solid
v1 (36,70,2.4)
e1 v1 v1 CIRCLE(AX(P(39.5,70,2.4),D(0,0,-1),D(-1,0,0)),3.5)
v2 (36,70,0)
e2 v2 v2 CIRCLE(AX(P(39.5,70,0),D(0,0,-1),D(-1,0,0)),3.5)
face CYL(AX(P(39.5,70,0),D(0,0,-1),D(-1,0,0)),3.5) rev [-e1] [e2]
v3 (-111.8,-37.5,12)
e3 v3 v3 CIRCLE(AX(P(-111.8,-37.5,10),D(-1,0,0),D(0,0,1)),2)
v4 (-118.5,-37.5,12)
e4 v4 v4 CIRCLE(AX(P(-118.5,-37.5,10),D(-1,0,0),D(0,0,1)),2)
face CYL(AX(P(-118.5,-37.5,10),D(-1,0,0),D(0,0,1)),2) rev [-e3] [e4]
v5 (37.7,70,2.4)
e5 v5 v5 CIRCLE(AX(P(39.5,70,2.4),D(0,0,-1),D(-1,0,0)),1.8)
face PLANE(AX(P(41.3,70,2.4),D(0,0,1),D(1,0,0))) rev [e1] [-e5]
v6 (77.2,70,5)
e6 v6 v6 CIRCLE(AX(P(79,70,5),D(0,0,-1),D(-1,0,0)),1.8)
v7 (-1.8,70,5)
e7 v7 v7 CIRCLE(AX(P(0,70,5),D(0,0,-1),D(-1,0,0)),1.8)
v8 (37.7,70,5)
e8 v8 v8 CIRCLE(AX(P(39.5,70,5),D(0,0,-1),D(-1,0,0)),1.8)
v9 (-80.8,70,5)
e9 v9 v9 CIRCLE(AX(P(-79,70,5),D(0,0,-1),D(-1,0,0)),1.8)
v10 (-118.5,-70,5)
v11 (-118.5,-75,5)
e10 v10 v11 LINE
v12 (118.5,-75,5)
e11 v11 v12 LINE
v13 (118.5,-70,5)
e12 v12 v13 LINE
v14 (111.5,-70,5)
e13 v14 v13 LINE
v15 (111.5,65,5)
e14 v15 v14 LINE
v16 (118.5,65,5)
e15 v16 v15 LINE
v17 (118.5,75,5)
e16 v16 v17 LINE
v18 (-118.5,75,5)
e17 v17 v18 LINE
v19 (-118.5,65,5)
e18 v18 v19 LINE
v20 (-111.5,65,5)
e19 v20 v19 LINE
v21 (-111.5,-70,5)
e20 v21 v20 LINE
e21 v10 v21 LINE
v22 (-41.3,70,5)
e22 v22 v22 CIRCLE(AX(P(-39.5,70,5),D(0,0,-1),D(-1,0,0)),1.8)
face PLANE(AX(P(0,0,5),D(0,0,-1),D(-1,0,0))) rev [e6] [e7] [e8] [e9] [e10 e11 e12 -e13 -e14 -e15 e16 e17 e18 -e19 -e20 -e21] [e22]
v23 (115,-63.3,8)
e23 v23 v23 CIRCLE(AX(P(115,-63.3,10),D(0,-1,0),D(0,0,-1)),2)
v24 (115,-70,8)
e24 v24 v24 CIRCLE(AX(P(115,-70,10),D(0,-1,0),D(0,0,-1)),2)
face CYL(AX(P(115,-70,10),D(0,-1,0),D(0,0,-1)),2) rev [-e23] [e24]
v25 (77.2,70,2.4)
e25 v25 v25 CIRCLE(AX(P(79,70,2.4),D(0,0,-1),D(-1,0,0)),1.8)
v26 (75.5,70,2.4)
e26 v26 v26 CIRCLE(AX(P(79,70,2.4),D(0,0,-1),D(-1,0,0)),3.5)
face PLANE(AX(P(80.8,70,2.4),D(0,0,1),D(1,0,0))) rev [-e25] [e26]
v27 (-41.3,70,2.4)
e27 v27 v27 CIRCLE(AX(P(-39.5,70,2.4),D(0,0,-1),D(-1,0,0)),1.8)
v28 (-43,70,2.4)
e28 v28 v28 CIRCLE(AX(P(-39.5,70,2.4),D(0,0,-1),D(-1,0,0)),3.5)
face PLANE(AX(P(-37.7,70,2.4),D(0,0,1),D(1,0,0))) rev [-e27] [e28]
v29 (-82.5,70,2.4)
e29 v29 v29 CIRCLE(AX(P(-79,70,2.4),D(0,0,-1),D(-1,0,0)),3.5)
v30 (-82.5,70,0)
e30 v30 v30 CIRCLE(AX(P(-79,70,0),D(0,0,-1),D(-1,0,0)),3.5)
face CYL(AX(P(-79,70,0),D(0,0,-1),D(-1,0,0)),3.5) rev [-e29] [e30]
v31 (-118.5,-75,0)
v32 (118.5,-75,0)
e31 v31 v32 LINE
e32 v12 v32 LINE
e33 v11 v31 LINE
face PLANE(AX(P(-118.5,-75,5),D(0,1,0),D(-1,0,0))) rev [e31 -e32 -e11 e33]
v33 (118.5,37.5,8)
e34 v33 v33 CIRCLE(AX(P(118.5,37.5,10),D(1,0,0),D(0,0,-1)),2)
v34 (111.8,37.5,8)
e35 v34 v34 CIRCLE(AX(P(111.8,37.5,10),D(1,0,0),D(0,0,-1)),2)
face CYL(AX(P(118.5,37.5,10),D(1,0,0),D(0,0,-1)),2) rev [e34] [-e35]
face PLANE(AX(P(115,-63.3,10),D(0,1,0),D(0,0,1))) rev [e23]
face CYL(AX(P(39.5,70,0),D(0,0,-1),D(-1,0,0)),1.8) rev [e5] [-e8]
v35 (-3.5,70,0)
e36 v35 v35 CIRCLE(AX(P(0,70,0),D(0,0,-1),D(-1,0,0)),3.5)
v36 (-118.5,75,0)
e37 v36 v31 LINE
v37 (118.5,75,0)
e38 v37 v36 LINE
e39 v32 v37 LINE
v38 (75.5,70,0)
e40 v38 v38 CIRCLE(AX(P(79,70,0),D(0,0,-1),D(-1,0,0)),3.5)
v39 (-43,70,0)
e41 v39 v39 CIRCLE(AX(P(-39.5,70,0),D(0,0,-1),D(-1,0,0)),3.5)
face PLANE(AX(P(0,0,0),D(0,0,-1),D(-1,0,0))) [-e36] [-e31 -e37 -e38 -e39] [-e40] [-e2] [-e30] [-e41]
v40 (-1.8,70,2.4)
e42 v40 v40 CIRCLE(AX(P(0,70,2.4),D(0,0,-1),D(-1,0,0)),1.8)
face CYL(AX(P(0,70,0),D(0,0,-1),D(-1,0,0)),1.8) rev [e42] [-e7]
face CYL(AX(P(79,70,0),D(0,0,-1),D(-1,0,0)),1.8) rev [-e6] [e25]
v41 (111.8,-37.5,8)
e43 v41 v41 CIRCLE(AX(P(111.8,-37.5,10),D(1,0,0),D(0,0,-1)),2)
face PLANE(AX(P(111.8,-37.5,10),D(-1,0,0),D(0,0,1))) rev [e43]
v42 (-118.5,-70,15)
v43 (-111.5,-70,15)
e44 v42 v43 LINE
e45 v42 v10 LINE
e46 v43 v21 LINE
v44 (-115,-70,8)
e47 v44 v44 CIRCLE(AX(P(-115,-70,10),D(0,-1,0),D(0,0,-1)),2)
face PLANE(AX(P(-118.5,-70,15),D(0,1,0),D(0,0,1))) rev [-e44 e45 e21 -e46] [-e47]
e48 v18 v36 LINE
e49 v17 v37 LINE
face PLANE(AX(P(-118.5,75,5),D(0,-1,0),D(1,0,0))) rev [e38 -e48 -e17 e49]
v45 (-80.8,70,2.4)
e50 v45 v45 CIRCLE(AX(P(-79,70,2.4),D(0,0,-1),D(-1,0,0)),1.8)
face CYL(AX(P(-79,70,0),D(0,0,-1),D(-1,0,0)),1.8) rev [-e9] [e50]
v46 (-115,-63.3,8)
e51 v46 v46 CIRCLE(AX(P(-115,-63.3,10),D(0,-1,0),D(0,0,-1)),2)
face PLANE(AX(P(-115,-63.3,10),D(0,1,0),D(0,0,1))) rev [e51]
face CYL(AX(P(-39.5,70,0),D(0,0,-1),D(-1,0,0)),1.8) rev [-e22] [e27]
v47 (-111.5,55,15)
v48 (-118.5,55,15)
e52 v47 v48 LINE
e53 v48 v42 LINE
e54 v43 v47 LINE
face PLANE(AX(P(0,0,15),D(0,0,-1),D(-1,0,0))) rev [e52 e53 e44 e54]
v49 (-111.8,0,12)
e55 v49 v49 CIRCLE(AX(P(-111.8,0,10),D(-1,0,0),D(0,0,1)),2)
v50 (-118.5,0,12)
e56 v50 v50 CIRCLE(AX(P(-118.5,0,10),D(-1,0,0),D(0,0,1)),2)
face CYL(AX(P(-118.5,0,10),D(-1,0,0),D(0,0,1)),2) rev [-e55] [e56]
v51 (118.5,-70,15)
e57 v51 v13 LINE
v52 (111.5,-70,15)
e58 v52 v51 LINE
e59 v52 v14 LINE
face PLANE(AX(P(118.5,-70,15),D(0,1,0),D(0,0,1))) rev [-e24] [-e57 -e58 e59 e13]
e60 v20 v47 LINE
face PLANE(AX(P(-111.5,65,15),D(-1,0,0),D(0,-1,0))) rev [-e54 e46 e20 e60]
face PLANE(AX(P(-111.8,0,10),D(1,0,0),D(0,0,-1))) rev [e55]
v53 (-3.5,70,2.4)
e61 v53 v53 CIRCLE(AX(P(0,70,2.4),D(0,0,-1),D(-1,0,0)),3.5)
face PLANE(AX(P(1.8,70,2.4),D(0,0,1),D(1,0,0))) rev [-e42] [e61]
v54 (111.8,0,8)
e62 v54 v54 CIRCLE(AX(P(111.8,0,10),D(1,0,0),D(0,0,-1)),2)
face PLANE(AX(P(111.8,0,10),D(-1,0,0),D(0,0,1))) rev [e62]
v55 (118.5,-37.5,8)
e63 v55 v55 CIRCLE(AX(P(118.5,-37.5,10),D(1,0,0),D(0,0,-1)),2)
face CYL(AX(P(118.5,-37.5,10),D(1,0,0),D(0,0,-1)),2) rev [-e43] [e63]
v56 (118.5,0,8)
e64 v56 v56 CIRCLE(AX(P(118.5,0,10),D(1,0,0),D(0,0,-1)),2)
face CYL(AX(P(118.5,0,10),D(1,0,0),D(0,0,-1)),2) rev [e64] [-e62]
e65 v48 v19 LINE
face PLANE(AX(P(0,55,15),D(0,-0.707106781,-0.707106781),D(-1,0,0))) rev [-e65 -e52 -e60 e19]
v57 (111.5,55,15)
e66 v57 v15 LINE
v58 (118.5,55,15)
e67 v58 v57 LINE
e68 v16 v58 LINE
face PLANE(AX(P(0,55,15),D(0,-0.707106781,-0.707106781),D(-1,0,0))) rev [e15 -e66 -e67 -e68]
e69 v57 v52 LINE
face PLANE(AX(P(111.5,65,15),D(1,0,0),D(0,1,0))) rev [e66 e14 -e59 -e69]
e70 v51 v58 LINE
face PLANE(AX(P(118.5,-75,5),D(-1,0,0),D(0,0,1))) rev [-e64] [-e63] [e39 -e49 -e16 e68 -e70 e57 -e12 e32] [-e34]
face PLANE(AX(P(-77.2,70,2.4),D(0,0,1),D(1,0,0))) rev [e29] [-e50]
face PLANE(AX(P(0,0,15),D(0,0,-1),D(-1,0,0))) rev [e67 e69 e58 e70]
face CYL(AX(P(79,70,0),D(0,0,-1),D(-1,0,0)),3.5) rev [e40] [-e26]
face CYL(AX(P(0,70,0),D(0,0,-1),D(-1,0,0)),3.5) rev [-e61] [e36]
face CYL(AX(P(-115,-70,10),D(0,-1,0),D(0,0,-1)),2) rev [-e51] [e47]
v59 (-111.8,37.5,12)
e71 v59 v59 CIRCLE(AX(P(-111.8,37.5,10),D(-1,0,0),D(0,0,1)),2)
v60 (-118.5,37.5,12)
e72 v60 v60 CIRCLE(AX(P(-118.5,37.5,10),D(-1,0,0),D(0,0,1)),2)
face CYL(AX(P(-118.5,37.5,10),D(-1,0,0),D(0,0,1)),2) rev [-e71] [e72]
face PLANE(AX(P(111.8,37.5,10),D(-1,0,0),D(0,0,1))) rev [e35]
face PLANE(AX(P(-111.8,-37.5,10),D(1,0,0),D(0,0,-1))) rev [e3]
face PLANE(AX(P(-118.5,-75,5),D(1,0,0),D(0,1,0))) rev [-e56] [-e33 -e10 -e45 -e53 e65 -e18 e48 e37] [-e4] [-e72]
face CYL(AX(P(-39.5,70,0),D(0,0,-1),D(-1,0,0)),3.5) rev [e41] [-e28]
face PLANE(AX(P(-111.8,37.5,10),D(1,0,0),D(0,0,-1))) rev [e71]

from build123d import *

# Parameters (mm, degrees)
SZKIC1_W                                          = 237
SZKIC1_H                                          = 150
DODANIE_WYCI_GNI_CIE1_DEPTH                       = 5
SZKIC2_W                                          = 7
SZKIC2_H                                          = 135
DODANIE_WYCI_GNI_CIE2_DEPTH                       = 10
OTW_R_4_0_4_1_D                                   = 4
OTW_R_4_0_4_1_DEPTH                               = 6.7
SFAZOWANIE1_SIZE                                  = 10
POG_BIENIE_WALCOWE_POD_M3_RUB_Z_BEM_S_D           = 3.6
POG_BIENIE_WALCOWE_POD_M3_RUB_Z_BEM_S_DEPTH       = 6.7
POG_BIENIE_WALCOWE_POD_M3_RUB_Z_BEM_S_CBORE_D     = 7
POG_BIENIE_WALCOWE_POD_M3_RUB_Z_BEM_S_CBORE_DEPTH = 2.4
POG_BIENIE_WALCOWE_POD_M3_RUB_Z_BEM_S_TIP         = 1.081549114
OTWORY_USTALAJ_CE_4_0MM1_D                        = 4
OTWORY_USTALAJ_CE_4_0MM1_DEPTH                    = 6.7


with BuildPart() as part:
    # Szkic1 → Dodanie-wyciągnięcie1 (new body)
    with BuildSketch(Plane.XY):
        Rectangle(SZKIC1_W, SZKIC1_H)
    extrude(amount=DODANIE_WYCI_GNI_CIE1_DEPTH)

    # Szkic2 → Dodanie-wyciągnięcie2 (add)
    with BuildSketch(Plane.XY.offset(5)):
        with Locations((115, -2.5)):
            Rectangle(SZKIC2_W, SZKIC2_H)
        with Locations((-115, -2.5)):
            Rectangle(SZKIC2_W, SZKIC2_H)
    extrude(amount=DODANIE_WYCI_GNI_CIE2_DEPTH)

    # Otwór Ø4.0 (4)1
    with Locations(Plane(origin=(118.5, 0, 0), x_dir=(0, 0, -1), z_dir=(1, 0, 0))):
        with Locations((-10, -37.5), (-10, 37.5), (-10, 0)):
            otw_r_4_0_4_1 = Hole(OTW_R_4_0_4_1_D / 2, depth=OTW_R_4_0_4_1_DEPTH)

    # Lustro1: Otwór Ø4.0 (4)1 across plane
    add(otw_r_4_0_4_1.mirror(Plane.ZY), mode=Mode.SUBTRACT)

    # Sfazowanie1
    sfazowanie1_edges = [part.edges().sort_by_distance(p)[0] for p in [
        (-115, 65, 15),
        (115, 65, 15),
    ]]
    chamfer(sfazowanie1_edges, length=SFAZOWANIE1_SIZE - 0.0001)  # a hair under: the kernel refuses the full size

    # Pogłębienie walcowe pod M3 Śrubę z łbem stożkowym ściętym1
    with Locations(Plane(origin=(0, 0, 0), x_dir=(-1, 0, 0), z_dir=(0, 0, -1))):
        with Locations((-79, 70), (-39.5, 70), (79, 70), (0, 70), (39.5, 70)):
            CounterBoreHole(POG_BIENIE_WALCOWE_POD_M3_RUB_Z_BEM_S_D / 2, POG_BIENIE_WALCOWE_POD_M3_RUB_Z_BEM_S_CBORE_D / 2, POG_BIENIE_WALCOWE_POD_M3_RUB_Z_BEM_S_CBORE_DEPTH, depth=POG_BIENIE_WALCOWE_POD_M3_RUB_Z_BEM_S_DEPTH)
            with Locations((0, 0, -(POG_BIENIE_WALCOWE_POD_M3_RUB_Z_BEM_S_DEPTH + POG_BIENIE_WALCOWE_POD_M3_RUB_Z_BEM_S_TIP / 2))):  # 118° drill point
                Cone(0, POG_BIENIE_WALCOWE_POD_M3_RUB_Z_BEM_S_D / 2, POG_BIENIE_WALCOWE_POD_M3_RUB_Z_BEM_S_TIP, mode=Mode.SUBTRACT)

    # Otwory ustalające Ø4.0mm1
    with Locations(Plane.XZ.offset(70)):
        with Locations((115, 10), (-115, 10)):
            Hole(OTWORY_USTALAJ_CE_4_0MM1_D / 2, depth=OTWORY_USTALAJ_CE_4_0MM1_DEPTH)


solid = part.part
